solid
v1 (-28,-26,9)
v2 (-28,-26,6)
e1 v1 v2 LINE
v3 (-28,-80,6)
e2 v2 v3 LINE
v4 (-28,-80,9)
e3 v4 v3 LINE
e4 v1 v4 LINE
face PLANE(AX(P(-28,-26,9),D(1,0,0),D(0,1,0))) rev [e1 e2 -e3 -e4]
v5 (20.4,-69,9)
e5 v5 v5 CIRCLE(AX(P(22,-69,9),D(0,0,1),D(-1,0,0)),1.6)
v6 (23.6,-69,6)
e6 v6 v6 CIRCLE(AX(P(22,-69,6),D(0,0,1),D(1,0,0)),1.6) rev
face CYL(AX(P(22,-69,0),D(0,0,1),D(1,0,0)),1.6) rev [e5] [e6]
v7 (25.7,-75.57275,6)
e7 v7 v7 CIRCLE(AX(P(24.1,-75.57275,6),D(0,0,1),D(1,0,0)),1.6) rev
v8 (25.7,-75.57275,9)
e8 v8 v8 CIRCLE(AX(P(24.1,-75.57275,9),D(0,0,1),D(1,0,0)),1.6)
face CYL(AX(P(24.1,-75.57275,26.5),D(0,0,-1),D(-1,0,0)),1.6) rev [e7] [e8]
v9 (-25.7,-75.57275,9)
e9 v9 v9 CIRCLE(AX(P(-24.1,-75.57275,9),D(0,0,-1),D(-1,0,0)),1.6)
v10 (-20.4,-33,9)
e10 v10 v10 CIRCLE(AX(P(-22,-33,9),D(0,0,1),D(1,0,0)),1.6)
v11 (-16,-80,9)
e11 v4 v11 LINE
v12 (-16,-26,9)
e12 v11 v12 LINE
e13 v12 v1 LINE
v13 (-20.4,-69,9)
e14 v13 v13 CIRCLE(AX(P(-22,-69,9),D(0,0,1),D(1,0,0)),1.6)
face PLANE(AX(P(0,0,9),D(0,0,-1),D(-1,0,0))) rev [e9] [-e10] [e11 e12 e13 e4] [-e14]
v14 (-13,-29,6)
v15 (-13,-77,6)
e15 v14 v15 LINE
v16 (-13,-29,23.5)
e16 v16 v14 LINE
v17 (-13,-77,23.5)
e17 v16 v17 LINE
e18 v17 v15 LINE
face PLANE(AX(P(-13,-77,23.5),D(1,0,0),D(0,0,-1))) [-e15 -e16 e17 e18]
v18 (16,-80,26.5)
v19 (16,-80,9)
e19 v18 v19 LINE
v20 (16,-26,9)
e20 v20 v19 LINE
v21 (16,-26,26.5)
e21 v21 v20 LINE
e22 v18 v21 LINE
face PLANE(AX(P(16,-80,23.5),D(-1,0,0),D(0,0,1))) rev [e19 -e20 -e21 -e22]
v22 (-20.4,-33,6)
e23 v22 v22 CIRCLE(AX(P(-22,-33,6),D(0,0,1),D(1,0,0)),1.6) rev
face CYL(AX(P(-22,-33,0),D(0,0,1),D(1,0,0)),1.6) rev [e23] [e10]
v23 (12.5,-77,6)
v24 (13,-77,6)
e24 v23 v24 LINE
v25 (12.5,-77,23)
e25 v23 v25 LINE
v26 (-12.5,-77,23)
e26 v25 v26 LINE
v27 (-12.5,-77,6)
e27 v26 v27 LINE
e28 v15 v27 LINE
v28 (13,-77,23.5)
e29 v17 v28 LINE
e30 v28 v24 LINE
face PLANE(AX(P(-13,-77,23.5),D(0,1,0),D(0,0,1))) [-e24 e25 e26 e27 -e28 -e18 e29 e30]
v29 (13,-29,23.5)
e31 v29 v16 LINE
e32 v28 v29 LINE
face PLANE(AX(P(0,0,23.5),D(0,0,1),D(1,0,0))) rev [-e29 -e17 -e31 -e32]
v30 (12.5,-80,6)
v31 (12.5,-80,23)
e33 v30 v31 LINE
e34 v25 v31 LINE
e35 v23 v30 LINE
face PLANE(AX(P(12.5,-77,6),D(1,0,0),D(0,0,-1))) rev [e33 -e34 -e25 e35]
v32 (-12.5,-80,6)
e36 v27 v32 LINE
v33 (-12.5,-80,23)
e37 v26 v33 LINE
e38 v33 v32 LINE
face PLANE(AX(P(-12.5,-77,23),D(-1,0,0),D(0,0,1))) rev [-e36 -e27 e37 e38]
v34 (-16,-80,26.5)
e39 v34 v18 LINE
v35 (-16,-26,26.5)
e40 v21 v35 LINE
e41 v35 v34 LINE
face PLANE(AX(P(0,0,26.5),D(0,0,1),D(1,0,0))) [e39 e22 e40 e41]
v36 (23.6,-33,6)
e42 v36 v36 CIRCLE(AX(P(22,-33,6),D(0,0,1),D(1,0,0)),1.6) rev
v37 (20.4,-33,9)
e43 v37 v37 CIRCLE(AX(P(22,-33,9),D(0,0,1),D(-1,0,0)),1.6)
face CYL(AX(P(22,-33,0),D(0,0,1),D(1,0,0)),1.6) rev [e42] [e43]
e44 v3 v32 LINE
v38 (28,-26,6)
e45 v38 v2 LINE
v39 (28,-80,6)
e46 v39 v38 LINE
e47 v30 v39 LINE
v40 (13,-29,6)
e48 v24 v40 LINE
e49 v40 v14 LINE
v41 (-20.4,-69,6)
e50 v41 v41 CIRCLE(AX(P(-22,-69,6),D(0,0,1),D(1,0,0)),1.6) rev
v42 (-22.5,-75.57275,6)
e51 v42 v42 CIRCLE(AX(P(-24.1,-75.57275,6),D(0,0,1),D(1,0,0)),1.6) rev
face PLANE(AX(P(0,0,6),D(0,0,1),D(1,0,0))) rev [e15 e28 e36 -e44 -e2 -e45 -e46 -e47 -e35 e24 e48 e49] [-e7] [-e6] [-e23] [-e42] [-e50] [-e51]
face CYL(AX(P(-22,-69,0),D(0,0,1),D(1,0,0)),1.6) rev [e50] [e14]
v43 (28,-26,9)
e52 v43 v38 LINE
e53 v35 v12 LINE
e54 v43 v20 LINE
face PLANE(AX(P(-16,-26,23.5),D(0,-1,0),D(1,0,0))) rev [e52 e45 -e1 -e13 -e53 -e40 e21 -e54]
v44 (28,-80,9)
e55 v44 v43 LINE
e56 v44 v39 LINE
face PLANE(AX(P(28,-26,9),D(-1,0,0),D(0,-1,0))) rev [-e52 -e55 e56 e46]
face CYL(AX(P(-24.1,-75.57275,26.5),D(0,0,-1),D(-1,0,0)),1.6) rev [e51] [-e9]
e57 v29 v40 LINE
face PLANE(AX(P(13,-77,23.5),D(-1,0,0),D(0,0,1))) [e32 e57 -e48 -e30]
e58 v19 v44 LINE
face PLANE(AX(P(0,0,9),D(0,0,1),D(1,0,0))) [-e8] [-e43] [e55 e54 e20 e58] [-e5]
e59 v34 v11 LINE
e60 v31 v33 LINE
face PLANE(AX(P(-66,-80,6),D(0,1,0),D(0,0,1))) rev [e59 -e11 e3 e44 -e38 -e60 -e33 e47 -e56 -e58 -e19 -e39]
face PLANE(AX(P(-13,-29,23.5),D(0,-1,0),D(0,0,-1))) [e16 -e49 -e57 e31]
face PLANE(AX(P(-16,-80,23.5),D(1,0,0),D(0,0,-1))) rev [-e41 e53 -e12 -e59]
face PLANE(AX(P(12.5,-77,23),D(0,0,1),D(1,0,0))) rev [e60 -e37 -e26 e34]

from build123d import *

# Parameters (mm, degrees)
SKETCH1_W           = 132
SKETCH1_H           = 160
BOSS_EXTRUDE1_DEPTH = 6
SKETCH3_W           = 32
SKETCH3_H           = 54
SKETCH3_W_2         = 26
SKETCH3_H_2         = 48
BOSS_EXTRUDE2_DEPTH = 17.5
SKETCH4_W           = 32
SKETCH4_H           = 54
BOSS_EXTRUDE3_DEPTH = 3
SKETCH5_W           = 25
SKETCH5_H           = 17
CUT_EXTRUDE1_DEPTH  = 3
SKETCH6_W           = 12
SKETCH6_H           = 54
BOSS_EXTRUDE4_DEPTH = 3
SKETCH7_R           = 1.6
CUT_EXTRUDE2_DEPTH  = 106.177231376
SKETCH8_W           = 3
SKETCH8_H           = 6.5
BOSS_EXTRUDE5_DEPTH = 20
SKETCH9_R           = 1.55
CUT_EXTRUDE3_DEPTH  = 6
SKETCH10_R          = 1.6
CUT_EXTRUDE4_DEPTH  = 108.043215572
SKETCH11_W          = 2.5
SKETCH11_H          = 7
BOSS_EXTRUDE6_DEPTH = 19.36
SKETCH12_R          = 1.6
CUT_EXTRUDE5_DEPTH  = 19.36
SKETCH13_W          = 3
SKETCH13_H          = 7
BOSS_EXTRUDE7_DEPTH = 15
SKETCH14_R          = 2
CUT_EXTRUDE6_DEPTH  = 15
CUT_EXTRUDE7_START  = -6
CUT_EXTRUDE7_DEPTH  = 6
SKETCH16_R          = 1.6
CUT_EXTRUDE8_DEPTH  = 15
SKETCH17_W          = 119.064494472
SKETCH17_H          = 144.515611373
CUT_EXTRUDE10_DEPTH = 61


# Read off the part's stored shape, not the designer's step: Cut-Extrude7
with BuildPart() as part:
    # Sketch1 → Boss-Extrude1 (new body)
    with BuildSketch(Plane.XY):
        Rectangle(SKETCH1_W, SKETCH1_H)
    extrude(amount=BOSS_EXTRUDE1_DEPTH)

    # Sketch3 → Boss-Extrude2 (add)
    with BuildSketch(Plane.XY.offset(6)):
        with Locations((0, -53)):
            Rectangle(SKETCH3_W, SKETCH3_H)
        with Locations((0, -53)):
            Rectangle(SKETCH3_W_2, SKETCH3_H_2, mode=Mode.SUBTRACT)
    extrude(amount=BOSS_EXTRUDE2_DEPTH)

    # Sketch4 → Boss-Extrude3 (add)
    with BuildSketch(Plane.XY.offset(23.5)):
        with Locations((0, -53)):
            Rectangle(SKETCH4_W, SKETCH4_H)
    extrude(amount=BOSS_EXTRUDE3_DEPTH)

    # Sketch5 → Cut-Extrude1 (cut)
    with BuildSketch(Plane.XZ.offset(80)):
        with Locations((0, 14.5)):
            Rectangle(SKETCH5_W, SKETCH5_H)
    extrude(amount=-CUT_EXTRUDE1_DEPTH, mode=Mode.SUBTRACT)

    # Sketch6 → Boss-Extrude4 (add)
    with BuildSketch(Plane.XY.offset(6)):
        with Locations((-22, -53)):
            Rectangle(SKETCH6_W, SKETCH6_H)
        with Locations((22, -53)):
            Rectangle(SKETCH6_W, SKETCH6_H)
    extrude(amount=BOSS_EXTRUDE4_DEPTH)

    # Sketch7 → Cut-Extrude2 (cut, through all)
    with BuildSketch(Plane.XY.offset(9)):
        with Locations((-22, -69)):
            Circle(SKETCH7_R)
        with Locations((-22, -33)):
            Circle(SKETCH7_R)
        with Locations(Location((22, -69, 0), (0, 0, 180))):
            Circle(SKETCH7_R)
        with Locations(Location((22, -33, 0), (0, 0, 180))):
            Circle(SKETCH7_R)
    extrude(amount=-CUT_EXTRUDE2_DEPTH, mode=Mode.SUBTRACT)

    # Sketch8 → Boss-Extrude5 (add)
    with BuildSketch(Plane.XY.offset(6)):
        with Locations((-54.38, -76.75)):
            Rectangle(SKETCH8_W, SKETCH8_H)
        with Locations((-54.38, -30.25)):
            Rectangle(SKETCH8_W, SKETCH8_H)
    boss_extrude5 = extrude(amount=BOSS_EXTRUDE5_DEPTH)

    # Sketch9 → Cut-Extrude3 (cut)
    with BuildSketch(Plane.ZY.offset(55.88)):
        with Locations((10.35, -76.75)):
            Circle(SKETCH9_R)
        with Locations((19.65, -76.75)):
            Circle(SKETCH9_R)
        with Locations((10.35, -30.25)):
            Circle(SKETCH9_R)
        with Locations((19.65, -30.25)):
            Circle(SKETCH9_R)
    cut_extrude3 = extrude(amount=-CUT_EXTRUDE3_DEPTH, mode=Mode.SUBTRACT)

    # Mirror1: Boss-Extrude5, Cut-Extrude3 across plane
    add(boss_extrude5.mirror(Plane(origin=(0, 0, 0), x_dir=(0, 0, 1), z_dir=(1, 0, 0))))
    add(cut_extrude3.mirror(Plane(origin=(0, 0, 0), x_dir=(0, 0, 1), z_dir=(1, 0, 0))), mode=Mode.SUBTRACT)

    # Sketch10 → Cut-Extrude4 (cut, through all)
    with BuildSketch(Plane(origin=(0, 0, 0), x_dir=(-1, 0, 0), z_dir=(0, 0, -1))):
        with Locations((-24.1, -75.572749788)):
            Circle(SKETCH10_R)
        with Locations((-21.15, -12.732749788)):
            Circle(SKETCH10_R)
        with Locations(Location((21.15, -12.732749788, 0), (0, 0, 180))):
            Circle(SKETCH10_R)
        with Locations((24.1, -75.572749788)):
            Circle(SKETCH10_R)
    extrude(amount=-CUT_EXTRUDE4_DEPTH, mode=Mode.SUBTRACT)

    # Sketch11 → Boss-Extrude6 (add)
    with BuildSketch(Plane(origin=(0, 0, 0), x_dir=(-1, 0, 0), z_dir=(0, 0, -1))):
        with Locations((-17.9, 1.267250212)):
            Rectangle(SKETCH11_W, SKETCH11_H)
        with Locations((-17.9, 50.267250212)):
            Rectangle(SKETCH11_W, SKETCH11_H)
    extrude(amount=BOSS_EXTRUDE6_DEPTH)

    # Sketch12 → Cut-Extrude5 (cut)
    with BuildSketch(Plane(origin=(19.15, 0, 0), x_dir=(0, 0, -1), z_dir=(1, 0, 0))):
        with Locations(Location((4.5, 50.267250212, 0), (0, 0, 90))):
            Circle(SKETCH12_R)
        with Locations(Location((14.5, 50.267250212, 0), (0, 0, 90))):
            Circle(SKETCH12_R)
        with Locations(Location((4.5, 1.267250212, 0), (0, 0, 90))):
            Circle(SKETCH12_R)
        with Locations(Location((14.5, 1.267250212, 0), (0, 0, 90))):
            Circle(SKETCH12_R)
    extrude(amount=-CUT_EXTRUDE5_DEPTH, mode=Mode.SUBTRACT)

    # Sketch13 → Boss-Extrude7 (add)
    with BuildSketch(Plane(origin=(0, 0, 0), x_dir=(-1, 0, 0), z_dir=(0, 0, -1))):
        with Locations((29.35, 35.967250212)):
            Rectangle(SKETCH13_W, SKETCH13_H)
    extrude(amount=BOSS_EXTRUDE7_DEPTH)

    # Sketch14 → Cut-Extrude6 (cut)
    with BuildSketch(Plane.ZY.offset(30.85)):
        with Locations((-9.9, 35.967250212)):
            Circle(SKETCH14_R)
    extrude(amount=-CUT_EXTRUDE6_DEPTH, mode=Mode.SUBTRACT)

    # Cut-Extrude7 outline → Cut-Extrude7 (cut)
    with BuildSketch(Plane(origin=(0, 0, 0), x_dir=(-1, 0, 0), z_dir=(0, 0, -1)).offset(CUT_EXTRUDE7_START)):
        Polygon((-30.85, 56.767250212), (30.85, 56.767250212), (30.85, -24), (58.88, -24), (58.88, -80), (66, -80), (66, 80), (-66, 80), (-66, -80), (-58.88, -80), (-58.88, -24), (-30.85, -24), align=None)
    extrude(amount=CUT_EXTRUDE7_DEPTH, mode=Mode.SUBTRACT)

    # Sketch16 → Cut-Extrude8 (cut)
    with BuildSketch(Plane(origin=(0, 0, 0), x_dir=(-1, 0, 0), z_dir=(0, 0, -1))):
        Circle(SKETCH16_R)
        with Locations((0, 52.767250212)):
            Circle(SKETCH16_R)
    extrude(amount=-CUT_EXTRUDE8_DEPTH, mode=Mode.SUBTRACT)

    # Sketch17 → Cut-Extrude10 (cut)
    with BuildSketch(Plane.XY.offset(6)):
        with Locations((0.652247236, -7.742194314)):
            Rectangle(SKETCH17_W, SKETCH17_H)
    extrude(amount=-CUT_EXTRUDE10_DEPTH, mode=Mode.SUBTRACT)


with BuildPart() as body_2:
    # of the pieces the cut leaves, the one that is kept (cut_extrude10_keep)
    add(part.part.solids().sort_by_distance((12.5, -80, 6))[0])


solid = body_2.part
